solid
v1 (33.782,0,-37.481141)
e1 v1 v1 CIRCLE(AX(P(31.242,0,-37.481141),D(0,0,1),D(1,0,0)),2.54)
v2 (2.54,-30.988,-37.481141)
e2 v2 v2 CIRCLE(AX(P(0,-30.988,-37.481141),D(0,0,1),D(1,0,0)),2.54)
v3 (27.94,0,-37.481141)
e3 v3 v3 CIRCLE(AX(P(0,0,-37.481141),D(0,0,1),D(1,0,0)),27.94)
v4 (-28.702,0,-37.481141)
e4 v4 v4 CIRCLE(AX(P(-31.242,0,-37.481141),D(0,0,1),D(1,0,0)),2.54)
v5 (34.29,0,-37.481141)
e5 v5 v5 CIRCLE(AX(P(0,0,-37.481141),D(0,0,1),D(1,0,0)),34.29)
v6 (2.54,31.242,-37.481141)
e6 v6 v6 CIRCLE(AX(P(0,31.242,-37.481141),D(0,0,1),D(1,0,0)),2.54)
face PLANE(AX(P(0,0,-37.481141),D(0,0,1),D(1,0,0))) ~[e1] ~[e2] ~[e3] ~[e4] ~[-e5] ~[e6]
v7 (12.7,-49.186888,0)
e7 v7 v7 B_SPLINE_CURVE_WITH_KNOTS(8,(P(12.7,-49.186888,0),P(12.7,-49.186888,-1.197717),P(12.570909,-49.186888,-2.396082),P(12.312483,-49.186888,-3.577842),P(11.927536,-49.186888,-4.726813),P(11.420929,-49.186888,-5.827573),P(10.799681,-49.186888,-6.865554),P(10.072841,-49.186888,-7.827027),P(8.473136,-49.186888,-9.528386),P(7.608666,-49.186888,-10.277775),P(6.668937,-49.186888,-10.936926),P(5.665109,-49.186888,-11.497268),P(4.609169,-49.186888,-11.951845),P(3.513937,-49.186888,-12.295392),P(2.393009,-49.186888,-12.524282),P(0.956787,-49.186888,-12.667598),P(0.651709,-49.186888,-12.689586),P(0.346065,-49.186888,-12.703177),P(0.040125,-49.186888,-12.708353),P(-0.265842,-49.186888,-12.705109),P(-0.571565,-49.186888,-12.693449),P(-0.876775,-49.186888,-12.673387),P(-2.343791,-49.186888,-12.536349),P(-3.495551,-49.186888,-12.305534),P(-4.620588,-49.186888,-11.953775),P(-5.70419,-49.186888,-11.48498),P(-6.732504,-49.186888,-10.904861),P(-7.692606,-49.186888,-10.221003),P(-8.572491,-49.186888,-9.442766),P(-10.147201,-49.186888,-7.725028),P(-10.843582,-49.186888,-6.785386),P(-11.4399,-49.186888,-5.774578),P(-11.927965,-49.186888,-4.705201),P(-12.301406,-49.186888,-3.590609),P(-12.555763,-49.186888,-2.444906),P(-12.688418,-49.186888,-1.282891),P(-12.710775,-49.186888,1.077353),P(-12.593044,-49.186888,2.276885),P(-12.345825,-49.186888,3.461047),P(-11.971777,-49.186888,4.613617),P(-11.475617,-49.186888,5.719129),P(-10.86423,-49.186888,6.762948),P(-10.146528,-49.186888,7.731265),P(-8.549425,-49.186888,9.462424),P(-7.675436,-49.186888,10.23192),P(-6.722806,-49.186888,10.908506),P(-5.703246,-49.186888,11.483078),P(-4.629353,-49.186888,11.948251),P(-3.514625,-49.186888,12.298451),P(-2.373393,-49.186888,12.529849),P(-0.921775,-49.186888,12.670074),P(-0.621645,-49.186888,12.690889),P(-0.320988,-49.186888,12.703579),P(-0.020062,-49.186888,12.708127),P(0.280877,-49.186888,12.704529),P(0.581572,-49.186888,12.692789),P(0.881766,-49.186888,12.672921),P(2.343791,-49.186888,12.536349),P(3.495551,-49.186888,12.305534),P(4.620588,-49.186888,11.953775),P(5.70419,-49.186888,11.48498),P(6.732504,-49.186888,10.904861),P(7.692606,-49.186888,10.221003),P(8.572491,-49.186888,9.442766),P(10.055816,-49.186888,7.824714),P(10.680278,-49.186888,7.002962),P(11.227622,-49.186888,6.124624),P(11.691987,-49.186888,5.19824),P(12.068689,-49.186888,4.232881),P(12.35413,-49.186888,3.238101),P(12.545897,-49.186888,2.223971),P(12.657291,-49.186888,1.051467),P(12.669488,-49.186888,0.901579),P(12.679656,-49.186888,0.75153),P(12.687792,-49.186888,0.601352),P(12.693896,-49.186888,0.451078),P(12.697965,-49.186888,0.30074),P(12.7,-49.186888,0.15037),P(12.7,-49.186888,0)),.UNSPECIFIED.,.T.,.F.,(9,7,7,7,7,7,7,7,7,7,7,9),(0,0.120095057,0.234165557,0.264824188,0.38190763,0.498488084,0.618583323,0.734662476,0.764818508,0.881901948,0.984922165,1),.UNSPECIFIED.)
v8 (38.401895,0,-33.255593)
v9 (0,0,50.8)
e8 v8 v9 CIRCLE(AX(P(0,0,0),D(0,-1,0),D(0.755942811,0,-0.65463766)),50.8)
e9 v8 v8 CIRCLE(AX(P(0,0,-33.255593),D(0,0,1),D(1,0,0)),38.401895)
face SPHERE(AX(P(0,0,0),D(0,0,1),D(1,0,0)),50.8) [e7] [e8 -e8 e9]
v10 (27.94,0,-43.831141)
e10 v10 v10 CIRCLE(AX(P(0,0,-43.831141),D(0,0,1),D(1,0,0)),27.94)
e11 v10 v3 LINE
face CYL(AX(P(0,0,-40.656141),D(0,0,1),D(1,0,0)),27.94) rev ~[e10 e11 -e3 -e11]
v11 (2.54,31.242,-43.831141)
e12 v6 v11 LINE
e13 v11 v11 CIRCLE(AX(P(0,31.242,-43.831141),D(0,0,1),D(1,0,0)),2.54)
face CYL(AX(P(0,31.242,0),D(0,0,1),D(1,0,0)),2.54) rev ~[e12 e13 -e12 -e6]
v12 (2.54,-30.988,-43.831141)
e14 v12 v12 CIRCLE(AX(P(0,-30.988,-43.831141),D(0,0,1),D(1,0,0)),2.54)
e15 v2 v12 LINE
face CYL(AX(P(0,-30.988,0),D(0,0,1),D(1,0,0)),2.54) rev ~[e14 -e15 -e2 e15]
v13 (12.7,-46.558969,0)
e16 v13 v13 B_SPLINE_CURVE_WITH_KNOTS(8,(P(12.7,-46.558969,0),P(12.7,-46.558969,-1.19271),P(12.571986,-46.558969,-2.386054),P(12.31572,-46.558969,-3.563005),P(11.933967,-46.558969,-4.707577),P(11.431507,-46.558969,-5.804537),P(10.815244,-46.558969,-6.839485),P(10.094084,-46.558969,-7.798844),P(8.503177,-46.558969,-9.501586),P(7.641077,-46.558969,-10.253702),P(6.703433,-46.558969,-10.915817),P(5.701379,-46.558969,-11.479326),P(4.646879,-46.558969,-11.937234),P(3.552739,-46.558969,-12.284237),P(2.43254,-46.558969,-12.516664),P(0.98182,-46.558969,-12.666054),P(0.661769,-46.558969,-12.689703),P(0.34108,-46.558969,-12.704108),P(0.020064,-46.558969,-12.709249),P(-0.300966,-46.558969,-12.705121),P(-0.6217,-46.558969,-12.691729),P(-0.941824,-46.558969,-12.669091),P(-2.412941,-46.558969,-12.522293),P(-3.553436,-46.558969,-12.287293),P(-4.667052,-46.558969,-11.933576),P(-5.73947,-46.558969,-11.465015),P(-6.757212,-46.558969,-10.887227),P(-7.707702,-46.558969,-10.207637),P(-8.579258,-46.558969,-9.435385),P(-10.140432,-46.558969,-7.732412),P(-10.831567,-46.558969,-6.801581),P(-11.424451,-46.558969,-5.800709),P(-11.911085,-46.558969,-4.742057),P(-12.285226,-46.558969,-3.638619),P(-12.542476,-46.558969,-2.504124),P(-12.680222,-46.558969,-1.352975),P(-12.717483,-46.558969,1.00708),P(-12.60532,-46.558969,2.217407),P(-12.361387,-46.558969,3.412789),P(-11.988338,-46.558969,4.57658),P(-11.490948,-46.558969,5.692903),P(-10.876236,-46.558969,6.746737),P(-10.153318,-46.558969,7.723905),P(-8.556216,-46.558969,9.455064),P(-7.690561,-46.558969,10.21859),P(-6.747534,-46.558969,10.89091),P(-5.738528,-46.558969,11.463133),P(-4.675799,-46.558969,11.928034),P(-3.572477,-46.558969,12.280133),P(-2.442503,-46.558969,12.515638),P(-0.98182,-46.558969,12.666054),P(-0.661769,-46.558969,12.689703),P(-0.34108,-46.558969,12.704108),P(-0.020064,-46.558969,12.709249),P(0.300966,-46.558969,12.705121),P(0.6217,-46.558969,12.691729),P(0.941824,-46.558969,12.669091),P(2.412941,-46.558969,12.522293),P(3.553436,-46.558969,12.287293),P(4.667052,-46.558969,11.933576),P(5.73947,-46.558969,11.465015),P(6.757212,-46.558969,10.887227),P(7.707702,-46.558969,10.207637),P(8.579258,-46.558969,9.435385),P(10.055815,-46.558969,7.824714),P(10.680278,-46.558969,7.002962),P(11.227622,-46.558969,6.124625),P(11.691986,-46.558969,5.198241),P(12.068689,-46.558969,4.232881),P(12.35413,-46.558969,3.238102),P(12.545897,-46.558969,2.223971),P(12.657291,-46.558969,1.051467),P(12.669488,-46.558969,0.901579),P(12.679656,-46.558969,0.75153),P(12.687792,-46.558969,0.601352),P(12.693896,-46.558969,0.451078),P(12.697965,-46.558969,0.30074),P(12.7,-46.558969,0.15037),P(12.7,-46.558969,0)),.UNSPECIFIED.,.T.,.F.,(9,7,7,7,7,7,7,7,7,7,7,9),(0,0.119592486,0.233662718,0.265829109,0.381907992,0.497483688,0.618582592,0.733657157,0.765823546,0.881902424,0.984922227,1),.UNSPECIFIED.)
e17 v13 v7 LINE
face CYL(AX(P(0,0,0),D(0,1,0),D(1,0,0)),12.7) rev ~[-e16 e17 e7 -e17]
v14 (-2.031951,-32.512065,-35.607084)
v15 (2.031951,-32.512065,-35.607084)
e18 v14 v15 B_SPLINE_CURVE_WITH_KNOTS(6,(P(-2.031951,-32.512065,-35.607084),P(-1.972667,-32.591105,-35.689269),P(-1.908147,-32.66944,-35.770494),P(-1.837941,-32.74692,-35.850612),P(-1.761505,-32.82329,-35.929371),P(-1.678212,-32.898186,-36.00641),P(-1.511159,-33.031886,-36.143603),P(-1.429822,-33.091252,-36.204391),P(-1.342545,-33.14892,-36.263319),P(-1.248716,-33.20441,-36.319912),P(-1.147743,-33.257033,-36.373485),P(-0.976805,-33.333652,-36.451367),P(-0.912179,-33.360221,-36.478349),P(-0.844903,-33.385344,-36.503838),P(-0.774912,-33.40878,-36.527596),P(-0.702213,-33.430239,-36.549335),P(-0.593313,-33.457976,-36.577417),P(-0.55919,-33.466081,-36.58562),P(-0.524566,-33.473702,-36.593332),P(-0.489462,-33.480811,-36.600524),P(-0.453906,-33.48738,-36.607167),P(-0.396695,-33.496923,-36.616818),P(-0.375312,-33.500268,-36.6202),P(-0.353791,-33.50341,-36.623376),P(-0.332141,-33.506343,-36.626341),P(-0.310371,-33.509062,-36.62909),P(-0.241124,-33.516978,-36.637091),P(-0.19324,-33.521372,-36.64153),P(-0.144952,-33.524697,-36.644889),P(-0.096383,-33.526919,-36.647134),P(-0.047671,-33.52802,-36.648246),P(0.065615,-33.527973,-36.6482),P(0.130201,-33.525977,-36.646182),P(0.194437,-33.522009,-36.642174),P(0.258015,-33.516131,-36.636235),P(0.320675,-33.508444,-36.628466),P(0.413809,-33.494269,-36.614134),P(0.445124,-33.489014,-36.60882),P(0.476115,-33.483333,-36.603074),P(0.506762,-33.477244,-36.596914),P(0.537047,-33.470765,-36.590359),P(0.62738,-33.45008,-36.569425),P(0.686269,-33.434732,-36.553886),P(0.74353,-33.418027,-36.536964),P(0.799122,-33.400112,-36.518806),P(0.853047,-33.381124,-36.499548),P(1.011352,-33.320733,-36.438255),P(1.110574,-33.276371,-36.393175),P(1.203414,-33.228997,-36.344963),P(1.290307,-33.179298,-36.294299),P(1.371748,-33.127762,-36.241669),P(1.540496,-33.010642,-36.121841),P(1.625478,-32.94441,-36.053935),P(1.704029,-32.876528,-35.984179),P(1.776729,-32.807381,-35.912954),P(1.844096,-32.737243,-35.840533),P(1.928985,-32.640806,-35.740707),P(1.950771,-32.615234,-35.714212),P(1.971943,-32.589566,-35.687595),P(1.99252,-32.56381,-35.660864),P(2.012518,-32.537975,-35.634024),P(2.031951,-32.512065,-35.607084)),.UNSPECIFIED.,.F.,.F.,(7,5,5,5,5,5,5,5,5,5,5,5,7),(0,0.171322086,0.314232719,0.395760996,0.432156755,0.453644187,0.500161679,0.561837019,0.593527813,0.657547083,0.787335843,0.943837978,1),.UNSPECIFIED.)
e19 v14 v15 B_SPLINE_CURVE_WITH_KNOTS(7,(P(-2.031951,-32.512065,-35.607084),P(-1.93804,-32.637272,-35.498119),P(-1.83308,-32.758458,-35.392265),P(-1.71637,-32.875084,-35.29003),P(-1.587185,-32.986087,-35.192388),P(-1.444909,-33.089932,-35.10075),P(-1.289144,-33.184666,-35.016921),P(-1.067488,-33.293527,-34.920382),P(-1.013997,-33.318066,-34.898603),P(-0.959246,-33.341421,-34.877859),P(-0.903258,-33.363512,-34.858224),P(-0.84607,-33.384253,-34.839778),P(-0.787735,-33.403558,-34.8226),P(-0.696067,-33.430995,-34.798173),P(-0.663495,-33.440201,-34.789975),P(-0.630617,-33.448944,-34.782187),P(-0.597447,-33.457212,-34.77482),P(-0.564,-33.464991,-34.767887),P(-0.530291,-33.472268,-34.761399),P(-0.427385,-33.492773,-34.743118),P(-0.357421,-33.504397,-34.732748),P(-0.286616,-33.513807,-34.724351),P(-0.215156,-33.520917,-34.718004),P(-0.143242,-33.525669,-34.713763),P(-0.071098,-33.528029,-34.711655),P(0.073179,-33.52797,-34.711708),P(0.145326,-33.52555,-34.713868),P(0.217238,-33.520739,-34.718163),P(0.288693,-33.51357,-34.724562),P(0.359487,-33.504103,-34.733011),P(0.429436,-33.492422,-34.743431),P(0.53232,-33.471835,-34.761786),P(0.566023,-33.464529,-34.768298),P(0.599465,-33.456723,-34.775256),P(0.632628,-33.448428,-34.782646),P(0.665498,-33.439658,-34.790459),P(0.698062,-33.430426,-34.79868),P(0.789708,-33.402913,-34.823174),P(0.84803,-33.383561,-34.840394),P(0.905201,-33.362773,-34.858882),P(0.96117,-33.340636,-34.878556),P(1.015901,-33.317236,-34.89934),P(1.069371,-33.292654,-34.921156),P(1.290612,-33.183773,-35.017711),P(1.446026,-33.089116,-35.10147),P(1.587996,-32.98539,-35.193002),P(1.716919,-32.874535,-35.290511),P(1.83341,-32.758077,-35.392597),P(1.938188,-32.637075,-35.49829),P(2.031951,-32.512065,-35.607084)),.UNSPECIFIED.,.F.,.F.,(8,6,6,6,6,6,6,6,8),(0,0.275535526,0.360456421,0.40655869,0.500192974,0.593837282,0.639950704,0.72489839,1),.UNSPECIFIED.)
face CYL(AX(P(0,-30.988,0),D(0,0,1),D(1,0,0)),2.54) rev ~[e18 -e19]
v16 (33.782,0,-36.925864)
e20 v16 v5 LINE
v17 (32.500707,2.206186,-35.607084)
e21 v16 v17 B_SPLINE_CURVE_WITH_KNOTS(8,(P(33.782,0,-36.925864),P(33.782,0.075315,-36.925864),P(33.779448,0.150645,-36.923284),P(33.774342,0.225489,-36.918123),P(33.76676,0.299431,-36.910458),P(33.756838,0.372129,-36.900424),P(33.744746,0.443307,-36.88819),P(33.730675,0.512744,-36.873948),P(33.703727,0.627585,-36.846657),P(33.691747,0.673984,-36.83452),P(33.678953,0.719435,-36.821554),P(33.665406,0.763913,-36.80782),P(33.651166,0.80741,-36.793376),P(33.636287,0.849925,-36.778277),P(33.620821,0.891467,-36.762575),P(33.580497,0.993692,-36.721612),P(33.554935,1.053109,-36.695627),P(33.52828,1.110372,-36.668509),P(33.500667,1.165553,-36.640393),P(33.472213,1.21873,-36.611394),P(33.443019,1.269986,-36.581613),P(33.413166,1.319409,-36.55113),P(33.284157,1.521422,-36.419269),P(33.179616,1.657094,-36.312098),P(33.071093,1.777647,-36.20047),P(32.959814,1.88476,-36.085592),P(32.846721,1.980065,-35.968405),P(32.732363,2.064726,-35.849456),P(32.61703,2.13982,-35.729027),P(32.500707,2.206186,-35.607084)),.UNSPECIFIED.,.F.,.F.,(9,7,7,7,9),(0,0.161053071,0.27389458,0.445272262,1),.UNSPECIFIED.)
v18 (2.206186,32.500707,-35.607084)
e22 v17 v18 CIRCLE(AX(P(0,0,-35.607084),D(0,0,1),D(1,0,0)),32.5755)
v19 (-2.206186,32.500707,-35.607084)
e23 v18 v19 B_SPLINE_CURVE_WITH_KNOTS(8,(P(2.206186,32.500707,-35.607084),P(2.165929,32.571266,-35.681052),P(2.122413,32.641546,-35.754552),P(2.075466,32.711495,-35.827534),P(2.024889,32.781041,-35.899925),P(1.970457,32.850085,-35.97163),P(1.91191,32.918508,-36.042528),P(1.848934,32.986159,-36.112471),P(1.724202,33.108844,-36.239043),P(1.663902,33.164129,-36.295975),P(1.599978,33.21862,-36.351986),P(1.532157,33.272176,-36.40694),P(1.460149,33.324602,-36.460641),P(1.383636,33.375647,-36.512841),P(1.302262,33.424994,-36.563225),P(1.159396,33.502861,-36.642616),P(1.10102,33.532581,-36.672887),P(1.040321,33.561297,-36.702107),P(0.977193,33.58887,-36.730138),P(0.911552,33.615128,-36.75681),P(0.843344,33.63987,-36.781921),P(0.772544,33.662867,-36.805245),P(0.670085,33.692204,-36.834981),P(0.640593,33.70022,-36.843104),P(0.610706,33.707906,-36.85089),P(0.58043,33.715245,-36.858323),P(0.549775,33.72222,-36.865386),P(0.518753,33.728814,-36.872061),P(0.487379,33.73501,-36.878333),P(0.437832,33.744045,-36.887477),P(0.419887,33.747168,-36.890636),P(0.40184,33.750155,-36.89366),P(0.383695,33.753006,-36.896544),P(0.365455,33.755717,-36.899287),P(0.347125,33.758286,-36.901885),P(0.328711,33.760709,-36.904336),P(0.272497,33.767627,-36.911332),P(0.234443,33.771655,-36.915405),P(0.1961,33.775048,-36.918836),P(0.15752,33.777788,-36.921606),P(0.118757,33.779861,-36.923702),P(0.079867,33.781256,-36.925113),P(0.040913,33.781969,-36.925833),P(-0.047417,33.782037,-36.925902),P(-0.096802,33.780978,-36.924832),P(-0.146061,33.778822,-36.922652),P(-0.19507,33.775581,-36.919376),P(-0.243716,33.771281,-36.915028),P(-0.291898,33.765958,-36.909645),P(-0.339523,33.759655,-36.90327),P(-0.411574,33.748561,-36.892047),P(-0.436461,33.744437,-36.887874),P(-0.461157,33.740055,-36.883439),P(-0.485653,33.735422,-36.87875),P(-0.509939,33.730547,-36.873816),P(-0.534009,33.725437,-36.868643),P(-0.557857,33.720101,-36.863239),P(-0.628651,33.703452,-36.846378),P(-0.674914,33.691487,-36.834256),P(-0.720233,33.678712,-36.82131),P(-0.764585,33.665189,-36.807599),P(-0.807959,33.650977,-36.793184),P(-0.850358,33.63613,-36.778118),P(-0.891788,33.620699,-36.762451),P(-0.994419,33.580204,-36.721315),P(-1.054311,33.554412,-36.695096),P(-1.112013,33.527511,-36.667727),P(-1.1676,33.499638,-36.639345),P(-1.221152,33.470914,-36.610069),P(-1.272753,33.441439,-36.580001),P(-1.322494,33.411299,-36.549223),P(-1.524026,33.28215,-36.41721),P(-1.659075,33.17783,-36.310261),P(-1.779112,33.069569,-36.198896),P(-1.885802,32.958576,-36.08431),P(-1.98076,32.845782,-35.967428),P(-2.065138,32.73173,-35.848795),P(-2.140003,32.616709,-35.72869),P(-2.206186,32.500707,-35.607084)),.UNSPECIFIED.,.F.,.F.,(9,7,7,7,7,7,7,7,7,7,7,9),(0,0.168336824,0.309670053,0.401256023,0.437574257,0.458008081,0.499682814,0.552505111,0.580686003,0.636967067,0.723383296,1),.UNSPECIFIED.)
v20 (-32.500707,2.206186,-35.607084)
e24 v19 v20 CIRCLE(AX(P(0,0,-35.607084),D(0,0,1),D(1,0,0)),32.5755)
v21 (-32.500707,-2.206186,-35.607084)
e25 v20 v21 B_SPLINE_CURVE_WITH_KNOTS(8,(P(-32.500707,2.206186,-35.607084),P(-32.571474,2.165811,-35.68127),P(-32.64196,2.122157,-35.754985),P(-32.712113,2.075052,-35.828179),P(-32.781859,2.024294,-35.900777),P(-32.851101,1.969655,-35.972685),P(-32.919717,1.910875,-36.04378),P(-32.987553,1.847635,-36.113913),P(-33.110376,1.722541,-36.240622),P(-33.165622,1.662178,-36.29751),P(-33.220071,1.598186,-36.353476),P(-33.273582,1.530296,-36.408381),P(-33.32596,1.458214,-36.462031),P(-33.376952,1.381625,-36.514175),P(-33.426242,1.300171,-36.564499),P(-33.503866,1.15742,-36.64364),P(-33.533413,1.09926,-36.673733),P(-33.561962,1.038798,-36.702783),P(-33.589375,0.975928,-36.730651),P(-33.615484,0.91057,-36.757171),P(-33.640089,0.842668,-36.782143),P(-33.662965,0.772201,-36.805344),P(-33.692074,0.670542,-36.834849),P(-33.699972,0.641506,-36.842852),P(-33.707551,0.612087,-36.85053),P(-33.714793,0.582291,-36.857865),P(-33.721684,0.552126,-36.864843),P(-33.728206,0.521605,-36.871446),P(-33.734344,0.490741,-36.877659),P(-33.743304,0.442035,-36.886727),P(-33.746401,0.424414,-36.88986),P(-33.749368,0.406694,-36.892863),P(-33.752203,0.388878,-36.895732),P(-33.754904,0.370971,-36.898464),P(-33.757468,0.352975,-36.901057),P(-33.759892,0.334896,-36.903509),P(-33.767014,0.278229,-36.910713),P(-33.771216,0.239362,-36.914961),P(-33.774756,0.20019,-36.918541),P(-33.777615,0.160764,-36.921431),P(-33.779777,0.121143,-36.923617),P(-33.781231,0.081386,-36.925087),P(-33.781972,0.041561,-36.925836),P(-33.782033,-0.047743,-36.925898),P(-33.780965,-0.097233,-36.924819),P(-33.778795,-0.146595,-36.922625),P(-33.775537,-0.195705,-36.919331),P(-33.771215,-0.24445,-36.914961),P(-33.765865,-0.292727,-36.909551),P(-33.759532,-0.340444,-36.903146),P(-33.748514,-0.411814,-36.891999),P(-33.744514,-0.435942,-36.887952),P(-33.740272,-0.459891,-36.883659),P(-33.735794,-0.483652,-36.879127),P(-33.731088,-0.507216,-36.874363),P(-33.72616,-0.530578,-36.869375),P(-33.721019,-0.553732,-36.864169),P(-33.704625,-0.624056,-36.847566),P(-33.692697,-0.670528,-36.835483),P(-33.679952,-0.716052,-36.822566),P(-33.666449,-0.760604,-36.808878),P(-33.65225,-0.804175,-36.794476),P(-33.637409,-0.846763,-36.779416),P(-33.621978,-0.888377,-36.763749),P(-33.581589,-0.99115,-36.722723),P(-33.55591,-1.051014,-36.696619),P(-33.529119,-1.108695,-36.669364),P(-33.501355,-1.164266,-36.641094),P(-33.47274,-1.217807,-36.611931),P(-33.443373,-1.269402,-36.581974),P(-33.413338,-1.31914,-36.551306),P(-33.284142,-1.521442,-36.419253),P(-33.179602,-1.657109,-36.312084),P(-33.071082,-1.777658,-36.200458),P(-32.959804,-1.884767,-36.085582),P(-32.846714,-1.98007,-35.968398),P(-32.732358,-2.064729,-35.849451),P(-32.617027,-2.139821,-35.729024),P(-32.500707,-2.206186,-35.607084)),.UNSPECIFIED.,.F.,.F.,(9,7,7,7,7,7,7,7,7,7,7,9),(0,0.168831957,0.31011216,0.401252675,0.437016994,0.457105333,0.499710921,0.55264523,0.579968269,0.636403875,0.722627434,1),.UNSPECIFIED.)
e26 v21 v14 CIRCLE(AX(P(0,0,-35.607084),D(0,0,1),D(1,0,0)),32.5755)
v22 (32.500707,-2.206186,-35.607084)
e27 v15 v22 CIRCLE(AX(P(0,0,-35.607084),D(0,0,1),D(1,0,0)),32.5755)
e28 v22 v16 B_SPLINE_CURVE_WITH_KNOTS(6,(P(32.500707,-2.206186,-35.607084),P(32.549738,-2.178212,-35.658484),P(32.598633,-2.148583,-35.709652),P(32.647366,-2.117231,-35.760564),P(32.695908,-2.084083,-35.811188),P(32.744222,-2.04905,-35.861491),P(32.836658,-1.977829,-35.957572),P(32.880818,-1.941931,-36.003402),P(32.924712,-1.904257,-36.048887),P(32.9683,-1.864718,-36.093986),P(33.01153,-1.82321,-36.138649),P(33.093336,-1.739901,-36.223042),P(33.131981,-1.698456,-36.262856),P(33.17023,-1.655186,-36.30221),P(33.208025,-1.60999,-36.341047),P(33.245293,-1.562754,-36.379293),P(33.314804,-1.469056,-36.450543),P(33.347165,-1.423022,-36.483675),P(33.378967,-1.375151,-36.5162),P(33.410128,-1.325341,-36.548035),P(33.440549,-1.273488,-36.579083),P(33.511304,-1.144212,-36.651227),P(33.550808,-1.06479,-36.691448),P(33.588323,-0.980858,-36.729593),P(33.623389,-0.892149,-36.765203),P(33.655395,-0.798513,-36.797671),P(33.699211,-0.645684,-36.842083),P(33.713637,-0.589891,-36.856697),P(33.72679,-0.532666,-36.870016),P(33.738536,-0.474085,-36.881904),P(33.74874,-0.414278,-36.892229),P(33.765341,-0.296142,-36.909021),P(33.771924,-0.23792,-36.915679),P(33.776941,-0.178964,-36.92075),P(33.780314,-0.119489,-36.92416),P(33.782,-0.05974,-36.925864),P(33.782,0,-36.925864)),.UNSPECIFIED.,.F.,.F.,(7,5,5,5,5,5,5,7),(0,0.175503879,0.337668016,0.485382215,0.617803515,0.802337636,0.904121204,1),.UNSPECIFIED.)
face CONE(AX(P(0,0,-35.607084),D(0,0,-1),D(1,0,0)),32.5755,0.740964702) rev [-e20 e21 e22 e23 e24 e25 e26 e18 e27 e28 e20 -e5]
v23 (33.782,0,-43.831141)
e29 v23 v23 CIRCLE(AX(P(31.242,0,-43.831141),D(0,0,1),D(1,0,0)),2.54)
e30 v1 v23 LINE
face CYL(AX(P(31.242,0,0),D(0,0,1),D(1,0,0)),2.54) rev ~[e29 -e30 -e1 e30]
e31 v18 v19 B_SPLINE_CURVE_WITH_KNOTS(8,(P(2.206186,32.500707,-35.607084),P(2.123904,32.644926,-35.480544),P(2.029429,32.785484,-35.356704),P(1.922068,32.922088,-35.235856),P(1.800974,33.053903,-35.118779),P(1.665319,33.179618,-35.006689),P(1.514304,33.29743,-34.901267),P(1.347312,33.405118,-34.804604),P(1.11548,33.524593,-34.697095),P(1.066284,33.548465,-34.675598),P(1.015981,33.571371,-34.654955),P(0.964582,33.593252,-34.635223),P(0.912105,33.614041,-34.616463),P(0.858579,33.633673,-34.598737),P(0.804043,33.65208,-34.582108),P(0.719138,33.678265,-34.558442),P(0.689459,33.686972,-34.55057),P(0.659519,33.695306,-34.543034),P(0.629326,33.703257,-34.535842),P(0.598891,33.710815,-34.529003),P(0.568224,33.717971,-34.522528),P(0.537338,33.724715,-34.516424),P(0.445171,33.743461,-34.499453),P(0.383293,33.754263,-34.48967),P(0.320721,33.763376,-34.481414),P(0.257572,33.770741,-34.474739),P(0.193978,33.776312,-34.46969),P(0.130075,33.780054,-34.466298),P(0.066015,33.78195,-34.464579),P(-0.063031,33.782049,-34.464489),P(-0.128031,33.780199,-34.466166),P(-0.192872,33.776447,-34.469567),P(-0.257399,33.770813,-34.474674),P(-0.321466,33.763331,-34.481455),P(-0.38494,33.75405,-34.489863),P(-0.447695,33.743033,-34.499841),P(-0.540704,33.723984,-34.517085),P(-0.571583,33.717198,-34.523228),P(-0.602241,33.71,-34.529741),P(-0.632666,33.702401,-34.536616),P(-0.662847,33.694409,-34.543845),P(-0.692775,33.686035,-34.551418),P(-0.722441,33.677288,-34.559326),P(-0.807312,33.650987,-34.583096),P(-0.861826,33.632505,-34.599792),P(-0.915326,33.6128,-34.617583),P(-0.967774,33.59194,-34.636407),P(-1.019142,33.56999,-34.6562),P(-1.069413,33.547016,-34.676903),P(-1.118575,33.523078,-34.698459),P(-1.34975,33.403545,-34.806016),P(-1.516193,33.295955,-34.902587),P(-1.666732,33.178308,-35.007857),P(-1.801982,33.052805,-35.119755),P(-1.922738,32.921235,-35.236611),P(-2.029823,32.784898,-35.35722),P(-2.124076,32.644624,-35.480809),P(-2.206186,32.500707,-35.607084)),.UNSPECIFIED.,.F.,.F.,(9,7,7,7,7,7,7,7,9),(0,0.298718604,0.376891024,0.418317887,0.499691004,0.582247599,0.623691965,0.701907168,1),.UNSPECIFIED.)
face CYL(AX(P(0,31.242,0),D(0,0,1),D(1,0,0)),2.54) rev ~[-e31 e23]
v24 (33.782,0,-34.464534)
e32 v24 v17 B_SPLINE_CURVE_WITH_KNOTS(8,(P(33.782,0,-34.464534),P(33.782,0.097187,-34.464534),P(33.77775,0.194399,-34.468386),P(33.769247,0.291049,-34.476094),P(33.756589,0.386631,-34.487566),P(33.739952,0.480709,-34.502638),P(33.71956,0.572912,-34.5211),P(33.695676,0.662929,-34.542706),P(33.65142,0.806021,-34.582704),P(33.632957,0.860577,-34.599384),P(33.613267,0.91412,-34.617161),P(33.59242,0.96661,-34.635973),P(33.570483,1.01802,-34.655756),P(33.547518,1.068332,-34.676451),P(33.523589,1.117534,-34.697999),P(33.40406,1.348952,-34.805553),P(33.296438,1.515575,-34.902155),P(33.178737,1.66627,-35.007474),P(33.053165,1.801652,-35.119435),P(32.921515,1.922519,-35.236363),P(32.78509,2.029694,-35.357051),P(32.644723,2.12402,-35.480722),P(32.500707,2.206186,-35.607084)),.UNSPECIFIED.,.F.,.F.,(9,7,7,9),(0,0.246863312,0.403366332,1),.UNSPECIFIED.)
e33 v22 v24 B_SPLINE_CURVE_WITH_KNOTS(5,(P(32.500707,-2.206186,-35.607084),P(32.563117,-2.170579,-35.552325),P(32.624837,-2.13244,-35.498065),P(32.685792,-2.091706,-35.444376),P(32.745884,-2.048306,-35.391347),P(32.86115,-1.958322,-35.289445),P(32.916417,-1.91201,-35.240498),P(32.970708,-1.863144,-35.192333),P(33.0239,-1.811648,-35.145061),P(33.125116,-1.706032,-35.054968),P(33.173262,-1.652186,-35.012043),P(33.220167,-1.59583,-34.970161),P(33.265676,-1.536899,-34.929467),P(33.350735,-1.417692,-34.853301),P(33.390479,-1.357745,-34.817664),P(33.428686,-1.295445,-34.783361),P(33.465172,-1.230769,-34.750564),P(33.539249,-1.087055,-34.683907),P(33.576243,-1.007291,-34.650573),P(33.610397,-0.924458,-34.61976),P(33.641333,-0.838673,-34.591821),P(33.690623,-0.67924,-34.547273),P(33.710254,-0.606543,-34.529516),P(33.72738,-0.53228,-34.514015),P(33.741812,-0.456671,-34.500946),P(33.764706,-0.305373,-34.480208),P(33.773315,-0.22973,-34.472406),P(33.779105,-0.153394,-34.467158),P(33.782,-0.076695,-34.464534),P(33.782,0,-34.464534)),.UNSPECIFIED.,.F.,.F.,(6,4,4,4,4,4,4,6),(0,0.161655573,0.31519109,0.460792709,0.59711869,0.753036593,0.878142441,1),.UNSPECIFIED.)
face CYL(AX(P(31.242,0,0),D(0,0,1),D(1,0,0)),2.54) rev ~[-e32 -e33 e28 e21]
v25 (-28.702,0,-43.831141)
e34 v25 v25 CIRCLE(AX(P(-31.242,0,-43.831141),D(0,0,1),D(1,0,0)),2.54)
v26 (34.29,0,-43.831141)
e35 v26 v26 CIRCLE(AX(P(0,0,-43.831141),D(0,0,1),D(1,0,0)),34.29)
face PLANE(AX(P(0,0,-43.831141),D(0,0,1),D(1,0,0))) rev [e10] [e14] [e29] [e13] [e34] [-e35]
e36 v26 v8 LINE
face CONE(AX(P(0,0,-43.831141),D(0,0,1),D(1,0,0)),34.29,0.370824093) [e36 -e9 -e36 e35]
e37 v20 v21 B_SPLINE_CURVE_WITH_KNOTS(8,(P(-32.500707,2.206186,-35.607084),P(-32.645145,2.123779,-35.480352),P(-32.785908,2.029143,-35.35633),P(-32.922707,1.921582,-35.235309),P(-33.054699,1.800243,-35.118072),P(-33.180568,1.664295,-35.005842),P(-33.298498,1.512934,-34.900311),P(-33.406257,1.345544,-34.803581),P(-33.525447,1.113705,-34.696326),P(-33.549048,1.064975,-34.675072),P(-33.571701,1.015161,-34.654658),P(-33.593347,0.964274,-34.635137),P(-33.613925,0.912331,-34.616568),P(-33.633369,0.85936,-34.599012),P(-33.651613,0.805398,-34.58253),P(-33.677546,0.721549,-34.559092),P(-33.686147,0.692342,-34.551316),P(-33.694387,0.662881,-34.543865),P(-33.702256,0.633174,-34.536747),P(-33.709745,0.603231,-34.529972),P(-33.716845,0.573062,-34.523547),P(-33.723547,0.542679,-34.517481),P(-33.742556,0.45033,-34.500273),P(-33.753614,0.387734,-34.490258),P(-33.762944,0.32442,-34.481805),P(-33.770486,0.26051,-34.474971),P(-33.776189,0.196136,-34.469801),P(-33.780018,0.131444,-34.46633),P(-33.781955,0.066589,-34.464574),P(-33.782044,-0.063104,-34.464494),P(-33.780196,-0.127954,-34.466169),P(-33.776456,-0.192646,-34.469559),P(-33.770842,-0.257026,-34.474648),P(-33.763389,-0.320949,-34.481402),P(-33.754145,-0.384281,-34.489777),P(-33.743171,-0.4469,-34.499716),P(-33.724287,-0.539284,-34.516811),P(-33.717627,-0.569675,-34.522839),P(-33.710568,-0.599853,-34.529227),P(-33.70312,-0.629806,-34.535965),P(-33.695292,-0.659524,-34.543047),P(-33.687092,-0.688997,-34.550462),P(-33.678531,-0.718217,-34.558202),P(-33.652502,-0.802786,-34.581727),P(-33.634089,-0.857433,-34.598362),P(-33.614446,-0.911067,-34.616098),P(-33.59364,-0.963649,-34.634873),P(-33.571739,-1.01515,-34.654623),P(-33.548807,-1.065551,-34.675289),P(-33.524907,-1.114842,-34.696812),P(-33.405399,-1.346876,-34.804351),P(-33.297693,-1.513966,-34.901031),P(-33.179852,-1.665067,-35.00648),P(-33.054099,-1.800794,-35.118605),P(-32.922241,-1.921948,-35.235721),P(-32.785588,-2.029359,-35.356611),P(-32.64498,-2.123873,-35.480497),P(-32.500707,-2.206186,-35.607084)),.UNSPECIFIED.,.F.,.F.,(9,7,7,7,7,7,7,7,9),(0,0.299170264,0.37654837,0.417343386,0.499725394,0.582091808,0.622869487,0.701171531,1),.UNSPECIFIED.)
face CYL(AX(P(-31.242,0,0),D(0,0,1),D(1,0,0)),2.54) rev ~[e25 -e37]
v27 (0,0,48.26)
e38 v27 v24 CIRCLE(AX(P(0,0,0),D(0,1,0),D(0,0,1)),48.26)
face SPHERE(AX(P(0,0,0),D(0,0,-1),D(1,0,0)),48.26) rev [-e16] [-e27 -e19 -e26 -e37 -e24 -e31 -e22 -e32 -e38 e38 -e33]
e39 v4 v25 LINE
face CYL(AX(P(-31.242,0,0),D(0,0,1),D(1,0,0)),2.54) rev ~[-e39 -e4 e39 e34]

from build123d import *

# Parameters (mm, degrees)
F0_W     = 6.35
F0_H     = 6.35
F2_D     = 25.4
F2_DEPTH = 50.801
F4_D     = 5.08
F4_DEPTH = 43.832140591
F6_D     = 5.08
F6_DEPTH = 43.832140591
F7_D     = 5.08
F7_DEPTH = 43.832140591


with BuildPart() as f1:
    # F0 (on Front) → F1 (revolve)
    with BuildSketch(Plane.XZ):
        with BuildLine():
            ThreePointArc((38.401894824, -33.2555931225), (46.2061907682, 21.1099013425), (0, 50.8))
            Line((0, 50.8), (0, 48.26))
            ThreePointArc((0, 48.26), (44.9856946855, 17.4732616779), (32.5755, -35.6070835614))
            Line((32.5755, -35.6070835614), (34.29, -37.481140591))
            ThreePointArc((34.29, -37.481140591), (36.407302923, -35.4280721162), (38.401894824, -33.2555931225))
        make_face()
        with Locations((31.115, -40.656140591)):
            Rectangle(F0_W, F0_H)
        with BuildLine():
            Line((34.29, -43.831140591), (38.401894824, -33.2555931225))
            ThreePointArc((38.401894824, -33.2555931225), (36.407302923, -35.4280721162), (34.29, -37.481140591))
            Line((34.29, -37.481140591), (34.29, -43.831140591))
        make_face()
    revolve(axis=Axis((0, 0, 49.53), (0, 0, 1)))

    # F2 (through all, one way)
    with BuildSketch(Plane(origin=(0, 0, 0), x_dir=(1, 0, 0), z_dir=(0, 1, 0))):
        with Locations((0, 0)):
            Circle(F2_D / 2)
    extrude(amount=-F2_DEPTH, mode=Mode.SUBTRACT)

    # F4 (through all, one way)
    with BuildSketch(Plane.XY):
        with Locations((-31.242, 0)):
            Circle(F4_D / 2)
    extrude(amount=-F4_DEPTH, mode=Mode.SUBTRACT)

    # F6 (through all, one way)
    with BuildSketch(Plane.XY):
        with Locations((0, -30.988)):
            Circle(F6_D / 2)
    extrude(amount=-F6_DEPTH, mode=Mode.SUBTRACT)

    # F7 (through all, one way)
    with BuildSketch(Plane.XY):
        with Locations((0, 31.242), (31.242, 0)):
            Circle(F7_D / 2)
    extrude(amount=-F7_DEPTH, mode=Mode.SUBTRACT)


solid = f1.part
